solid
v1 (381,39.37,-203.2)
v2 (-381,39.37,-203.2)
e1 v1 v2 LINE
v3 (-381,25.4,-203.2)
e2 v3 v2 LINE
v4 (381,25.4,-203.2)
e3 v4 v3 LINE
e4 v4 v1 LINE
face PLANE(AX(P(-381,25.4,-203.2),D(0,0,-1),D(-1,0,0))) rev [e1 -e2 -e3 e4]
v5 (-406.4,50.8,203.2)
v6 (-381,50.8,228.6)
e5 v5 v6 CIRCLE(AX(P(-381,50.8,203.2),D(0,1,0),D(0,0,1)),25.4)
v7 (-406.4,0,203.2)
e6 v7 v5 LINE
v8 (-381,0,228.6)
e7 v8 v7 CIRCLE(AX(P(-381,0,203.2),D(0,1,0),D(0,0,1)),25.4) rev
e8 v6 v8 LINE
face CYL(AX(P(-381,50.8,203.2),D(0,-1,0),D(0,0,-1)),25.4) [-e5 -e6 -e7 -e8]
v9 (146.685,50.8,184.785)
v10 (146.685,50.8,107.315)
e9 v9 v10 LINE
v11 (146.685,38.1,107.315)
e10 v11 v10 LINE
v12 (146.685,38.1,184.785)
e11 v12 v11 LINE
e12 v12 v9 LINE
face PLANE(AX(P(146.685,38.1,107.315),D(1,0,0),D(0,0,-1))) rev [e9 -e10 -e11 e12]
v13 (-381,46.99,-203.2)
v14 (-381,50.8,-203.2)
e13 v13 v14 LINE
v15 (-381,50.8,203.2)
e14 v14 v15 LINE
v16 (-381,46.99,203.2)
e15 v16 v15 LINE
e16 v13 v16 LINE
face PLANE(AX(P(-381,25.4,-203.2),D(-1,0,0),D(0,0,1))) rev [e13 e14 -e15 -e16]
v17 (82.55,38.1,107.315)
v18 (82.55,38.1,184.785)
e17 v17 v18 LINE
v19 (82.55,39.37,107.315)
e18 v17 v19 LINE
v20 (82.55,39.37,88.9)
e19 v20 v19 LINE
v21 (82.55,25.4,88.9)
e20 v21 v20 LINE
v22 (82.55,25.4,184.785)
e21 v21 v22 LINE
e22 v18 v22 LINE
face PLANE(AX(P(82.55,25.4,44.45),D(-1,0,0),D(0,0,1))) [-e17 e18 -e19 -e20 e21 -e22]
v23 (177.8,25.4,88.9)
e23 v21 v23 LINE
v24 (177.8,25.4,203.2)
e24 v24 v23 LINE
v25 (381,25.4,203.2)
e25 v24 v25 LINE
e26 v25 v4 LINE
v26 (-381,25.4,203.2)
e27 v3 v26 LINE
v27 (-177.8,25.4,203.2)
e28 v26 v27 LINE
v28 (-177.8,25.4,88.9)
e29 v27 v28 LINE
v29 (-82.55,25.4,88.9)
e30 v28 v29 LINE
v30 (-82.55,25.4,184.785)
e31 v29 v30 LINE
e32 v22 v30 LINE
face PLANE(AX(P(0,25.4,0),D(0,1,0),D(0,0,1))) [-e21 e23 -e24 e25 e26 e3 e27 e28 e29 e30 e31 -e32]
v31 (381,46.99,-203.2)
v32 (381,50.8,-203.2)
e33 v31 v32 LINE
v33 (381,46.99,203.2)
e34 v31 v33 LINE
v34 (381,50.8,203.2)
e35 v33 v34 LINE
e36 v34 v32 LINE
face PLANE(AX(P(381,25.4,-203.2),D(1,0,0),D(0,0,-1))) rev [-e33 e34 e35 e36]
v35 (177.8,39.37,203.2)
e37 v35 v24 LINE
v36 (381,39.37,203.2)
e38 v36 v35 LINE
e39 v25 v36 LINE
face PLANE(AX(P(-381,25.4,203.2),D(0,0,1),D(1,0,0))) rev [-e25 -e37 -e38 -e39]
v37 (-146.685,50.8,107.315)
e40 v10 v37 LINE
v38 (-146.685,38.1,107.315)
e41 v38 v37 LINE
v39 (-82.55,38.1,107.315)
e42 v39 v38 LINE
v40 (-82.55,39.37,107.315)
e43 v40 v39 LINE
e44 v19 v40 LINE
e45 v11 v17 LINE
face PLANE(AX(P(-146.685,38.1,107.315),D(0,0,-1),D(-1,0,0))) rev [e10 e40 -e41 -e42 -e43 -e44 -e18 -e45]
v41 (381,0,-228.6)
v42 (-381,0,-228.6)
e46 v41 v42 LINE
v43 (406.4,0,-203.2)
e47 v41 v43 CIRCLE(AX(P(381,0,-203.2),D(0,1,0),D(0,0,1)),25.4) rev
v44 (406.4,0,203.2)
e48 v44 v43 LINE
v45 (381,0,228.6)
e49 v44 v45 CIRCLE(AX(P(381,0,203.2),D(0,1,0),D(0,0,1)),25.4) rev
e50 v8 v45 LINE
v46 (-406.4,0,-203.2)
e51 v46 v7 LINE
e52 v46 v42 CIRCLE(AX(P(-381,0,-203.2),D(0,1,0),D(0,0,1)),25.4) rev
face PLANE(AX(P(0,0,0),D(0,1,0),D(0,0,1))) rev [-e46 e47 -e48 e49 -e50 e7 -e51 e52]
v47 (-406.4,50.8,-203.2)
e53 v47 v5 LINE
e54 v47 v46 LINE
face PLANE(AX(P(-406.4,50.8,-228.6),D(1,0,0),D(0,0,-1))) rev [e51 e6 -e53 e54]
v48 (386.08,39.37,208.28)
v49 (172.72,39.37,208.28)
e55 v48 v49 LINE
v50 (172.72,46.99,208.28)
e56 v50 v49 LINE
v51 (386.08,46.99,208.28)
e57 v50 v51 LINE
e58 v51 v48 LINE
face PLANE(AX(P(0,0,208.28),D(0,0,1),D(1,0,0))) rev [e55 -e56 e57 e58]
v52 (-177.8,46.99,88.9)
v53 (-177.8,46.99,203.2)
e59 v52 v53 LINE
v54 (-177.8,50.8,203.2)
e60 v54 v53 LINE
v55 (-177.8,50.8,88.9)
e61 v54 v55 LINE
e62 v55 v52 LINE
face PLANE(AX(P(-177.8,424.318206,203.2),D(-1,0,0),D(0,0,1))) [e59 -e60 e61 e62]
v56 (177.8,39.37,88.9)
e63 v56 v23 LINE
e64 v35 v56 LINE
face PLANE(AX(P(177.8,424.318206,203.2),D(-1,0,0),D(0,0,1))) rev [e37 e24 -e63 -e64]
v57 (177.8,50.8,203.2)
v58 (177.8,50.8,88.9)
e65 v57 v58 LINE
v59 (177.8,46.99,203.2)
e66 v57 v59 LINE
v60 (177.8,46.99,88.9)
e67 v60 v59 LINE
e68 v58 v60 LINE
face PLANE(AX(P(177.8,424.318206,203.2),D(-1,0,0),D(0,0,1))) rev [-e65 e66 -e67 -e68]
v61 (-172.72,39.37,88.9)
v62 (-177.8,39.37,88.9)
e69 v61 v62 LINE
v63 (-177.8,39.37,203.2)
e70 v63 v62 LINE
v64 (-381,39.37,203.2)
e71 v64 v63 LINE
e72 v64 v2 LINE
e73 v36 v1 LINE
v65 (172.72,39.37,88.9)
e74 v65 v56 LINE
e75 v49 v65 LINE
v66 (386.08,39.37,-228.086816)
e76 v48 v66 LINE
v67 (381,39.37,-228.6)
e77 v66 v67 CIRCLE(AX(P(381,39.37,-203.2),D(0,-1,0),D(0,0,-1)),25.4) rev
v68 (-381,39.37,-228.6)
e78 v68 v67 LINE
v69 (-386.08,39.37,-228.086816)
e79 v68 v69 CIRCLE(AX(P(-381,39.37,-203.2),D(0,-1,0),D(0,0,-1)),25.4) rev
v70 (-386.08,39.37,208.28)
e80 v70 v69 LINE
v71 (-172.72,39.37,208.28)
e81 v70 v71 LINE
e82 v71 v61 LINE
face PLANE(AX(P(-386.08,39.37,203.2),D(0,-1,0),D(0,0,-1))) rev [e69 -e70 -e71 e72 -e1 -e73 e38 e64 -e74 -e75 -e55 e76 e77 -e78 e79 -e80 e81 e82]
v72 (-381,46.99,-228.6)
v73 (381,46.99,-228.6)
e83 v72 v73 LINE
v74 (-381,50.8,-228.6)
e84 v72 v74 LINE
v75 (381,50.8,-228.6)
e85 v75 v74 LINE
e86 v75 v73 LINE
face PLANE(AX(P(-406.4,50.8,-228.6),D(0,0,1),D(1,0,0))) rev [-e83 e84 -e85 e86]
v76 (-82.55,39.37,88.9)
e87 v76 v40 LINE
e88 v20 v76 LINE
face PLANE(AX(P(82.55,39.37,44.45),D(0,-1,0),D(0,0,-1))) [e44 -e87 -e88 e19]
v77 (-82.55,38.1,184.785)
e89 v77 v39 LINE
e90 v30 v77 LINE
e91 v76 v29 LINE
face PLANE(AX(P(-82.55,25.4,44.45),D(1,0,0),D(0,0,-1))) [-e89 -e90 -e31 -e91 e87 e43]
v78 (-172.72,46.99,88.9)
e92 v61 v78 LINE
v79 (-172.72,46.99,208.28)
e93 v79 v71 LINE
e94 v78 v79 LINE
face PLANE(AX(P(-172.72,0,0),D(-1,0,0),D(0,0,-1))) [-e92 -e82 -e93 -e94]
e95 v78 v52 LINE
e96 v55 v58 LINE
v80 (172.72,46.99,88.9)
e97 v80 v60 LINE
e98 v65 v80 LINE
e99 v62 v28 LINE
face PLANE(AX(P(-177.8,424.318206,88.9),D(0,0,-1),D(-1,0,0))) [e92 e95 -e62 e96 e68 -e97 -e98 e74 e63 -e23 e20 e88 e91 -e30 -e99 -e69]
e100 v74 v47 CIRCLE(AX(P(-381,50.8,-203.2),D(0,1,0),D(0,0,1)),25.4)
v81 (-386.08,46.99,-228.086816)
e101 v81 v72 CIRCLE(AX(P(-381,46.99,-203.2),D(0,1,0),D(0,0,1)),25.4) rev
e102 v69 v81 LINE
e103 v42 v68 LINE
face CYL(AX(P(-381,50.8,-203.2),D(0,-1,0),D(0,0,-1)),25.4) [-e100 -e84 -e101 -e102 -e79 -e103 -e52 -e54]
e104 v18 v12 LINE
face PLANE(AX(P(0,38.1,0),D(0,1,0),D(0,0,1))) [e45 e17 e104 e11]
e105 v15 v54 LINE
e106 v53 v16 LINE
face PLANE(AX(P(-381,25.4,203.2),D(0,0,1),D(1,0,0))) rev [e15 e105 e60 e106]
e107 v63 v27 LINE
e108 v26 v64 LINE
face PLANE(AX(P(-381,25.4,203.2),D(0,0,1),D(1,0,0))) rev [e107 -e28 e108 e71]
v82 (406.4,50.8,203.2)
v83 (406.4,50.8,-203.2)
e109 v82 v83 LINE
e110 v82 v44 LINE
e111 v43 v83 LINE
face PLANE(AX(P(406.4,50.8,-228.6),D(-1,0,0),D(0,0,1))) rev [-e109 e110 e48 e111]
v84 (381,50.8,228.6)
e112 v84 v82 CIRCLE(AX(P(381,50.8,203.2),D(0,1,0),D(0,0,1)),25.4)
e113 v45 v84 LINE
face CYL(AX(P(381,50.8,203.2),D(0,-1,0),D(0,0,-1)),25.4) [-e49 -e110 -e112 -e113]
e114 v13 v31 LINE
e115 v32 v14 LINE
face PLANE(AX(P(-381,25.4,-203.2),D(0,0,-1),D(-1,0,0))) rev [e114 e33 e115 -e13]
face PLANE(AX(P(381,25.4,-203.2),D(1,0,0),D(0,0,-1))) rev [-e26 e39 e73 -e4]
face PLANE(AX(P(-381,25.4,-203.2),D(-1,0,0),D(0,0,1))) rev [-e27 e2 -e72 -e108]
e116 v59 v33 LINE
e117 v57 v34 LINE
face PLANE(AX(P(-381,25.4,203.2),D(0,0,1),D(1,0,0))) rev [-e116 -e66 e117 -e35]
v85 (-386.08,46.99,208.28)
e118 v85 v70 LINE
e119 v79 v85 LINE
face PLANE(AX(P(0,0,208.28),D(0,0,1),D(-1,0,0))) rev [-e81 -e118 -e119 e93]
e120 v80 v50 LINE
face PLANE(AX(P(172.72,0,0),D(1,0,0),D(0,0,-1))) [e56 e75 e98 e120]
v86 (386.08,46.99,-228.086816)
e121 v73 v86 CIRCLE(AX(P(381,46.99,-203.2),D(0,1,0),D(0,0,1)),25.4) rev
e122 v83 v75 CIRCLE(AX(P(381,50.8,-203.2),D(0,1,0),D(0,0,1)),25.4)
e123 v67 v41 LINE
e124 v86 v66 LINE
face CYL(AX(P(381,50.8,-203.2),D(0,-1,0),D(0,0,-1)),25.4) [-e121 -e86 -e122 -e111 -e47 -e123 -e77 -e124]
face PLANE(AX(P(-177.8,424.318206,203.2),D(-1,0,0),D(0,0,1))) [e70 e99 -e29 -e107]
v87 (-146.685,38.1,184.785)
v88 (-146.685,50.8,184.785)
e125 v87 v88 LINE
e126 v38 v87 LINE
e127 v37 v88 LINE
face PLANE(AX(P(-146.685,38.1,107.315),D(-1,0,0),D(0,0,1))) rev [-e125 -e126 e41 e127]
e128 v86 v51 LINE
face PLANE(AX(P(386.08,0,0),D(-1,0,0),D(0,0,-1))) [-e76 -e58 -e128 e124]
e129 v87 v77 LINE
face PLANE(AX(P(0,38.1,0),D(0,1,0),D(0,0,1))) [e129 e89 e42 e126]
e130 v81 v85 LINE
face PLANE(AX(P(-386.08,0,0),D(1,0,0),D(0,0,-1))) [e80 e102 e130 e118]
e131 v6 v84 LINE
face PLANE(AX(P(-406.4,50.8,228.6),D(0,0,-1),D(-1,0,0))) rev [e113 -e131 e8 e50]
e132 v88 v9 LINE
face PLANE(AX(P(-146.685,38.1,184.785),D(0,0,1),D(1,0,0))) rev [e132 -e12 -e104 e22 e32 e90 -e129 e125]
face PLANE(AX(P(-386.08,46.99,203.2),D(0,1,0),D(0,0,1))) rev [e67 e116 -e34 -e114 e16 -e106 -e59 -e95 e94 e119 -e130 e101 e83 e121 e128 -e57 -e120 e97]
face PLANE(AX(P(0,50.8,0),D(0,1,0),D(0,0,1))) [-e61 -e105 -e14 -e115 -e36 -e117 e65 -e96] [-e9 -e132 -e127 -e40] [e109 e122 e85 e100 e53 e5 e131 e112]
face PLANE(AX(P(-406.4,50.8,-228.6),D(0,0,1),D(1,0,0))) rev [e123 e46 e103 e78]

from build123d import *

# Parameters (mm, degrees)
SKETCH3_W                       = 812.8
SKETCH3_H                       = 457.2
BOSS_EXTRUDE3_DEPTH             = 50.8
SKETCH7_W                       = 762
SKETCH7_H                       = 406.4
CUT_EXTRUDE1_DEPTH              = 25.4
SKETCH8_W                       = 355.6
SKETCH8_H                       = 114.3
BOSS_EXTRUDE7_DEPTH             = 25.4
SKETCH23_W                      = 431.8
SKETCH23_H                      = 7.62
CUT_EXTRUDE11_DEPTH             = 5.08
SKETCH24_W                      = 762
SKETCH24_H                      = 7.62
CUT_EXTRUDE12_DEPTH             = 81.026
SKETCH26_W                      = 208.28
SKETCH26_H                      = 7.62
CUT_EXTRUDE13_DEPTH             = 5.08
SKETCH28_W                      = 119.38
SKETCH28_H                      = 7.62
CUT_EXTRUDE14_DEPTH             = 5.08
SKETCH30_W                      = 293.37
SKETCH30_H                      = 77.47
CUT_EXTRUDE16_DEPTH             = 12.7
CUT_EXTRUDE19_REACH             = 520.216
SKETCH32_W                      = 165.1
SKETCH32_H                      = 13.97
CUT_EXTRUDE19_DIRECTION_2_DEPTH = 44.45
FILLET1_R                       = 25.4


with BuildPart() as part:
    # Sketch3 → Boss-Extrude3 (new body)
    with BuildSketch(Plane(origin=(0, 0, 0), x_dir=(1, 0, 0), z_dir=(0, 1, 0))):
        Rectangle(SKETCH3_W, SKETCH3_H)
    extrude(amount=BOSS_EXTRUDE3_DEPTH)

    # Sketch7 → Cut-Extrude1 (cut)
    with BuildSketch(Plane(origin=(0, 50.8, 0), x_dir=(1, 0, 0), z_dir=(0, 1, 0))):
        Rectangle(SKETCH7_W, SKETCH7_H)
    extrude(amount=-CUT_EXTRUDE1_DEPTH, mode=Mode.SUBTRACT)

    # Sketch8 → Boss-Extrude7 (add)
    with BuildSketch(Plane(origin=(0, 25.4, 0), x_dir=(1, 0, 0), z_dir=(0, 1, 0))):
        with Locations((0, -146.05)):
            Rectangle(SKETCH8_W, SKETCH8_H)
    extrude(amount=BOSS_EXTRUDE7_DEPTH)

    # Sketch23 → Cut-Extrude11 (cut)
    with BuildSketch(Plane(origin=(-381, 0, 0), x_dir=(0, 0, -1), z_dir=(1, 0, 0))):
        with Locations((12.7, 43.18)):
            Rectangle(SKETCH23_W, SKETCH23_H)
    cut_extrude11 = extrude(amount=-CUT_EXTRUDE11_DEPTH, mode=Mode.SUBTRACT)

    # Mirror3: Cut-Extrude11 across plane
    add(cut_extrude11.mirror(Plane(origin=(0, 0, 0), x_dir=(0, 0, 1), z_dir=(1, 0, 0))), mode=Mode.SUBTRACT)

    # Sketch24 → Cut-Extrude12 (cut)
    with BuildSketch(Plane(origin=(0, 0, -228.6), x_dir=(-1, 0, 0), z_dir=(0, 0, -1))):
        with Locations((0, 43.18)):
            Rectangle(SKETCH24_W, SKETCH24_H)
    extrude(amount=-CUT_EXTRUDE12_DEPTH, mode=Mode.SUBTRACT)

    # Sketch26 → Cut-Extrude13 (cut)
    with BuildSketch(Plane(origin=(0, 0, 203.2), x_dir=(-1, 0, 0), z_dir=(0, 0, -1))):
        with Locations((-281.94, 43.18)):
            Rectangle(SKETCH26_W, SKETCH26_H)
    cut_extrude13 = extrude(amount=-CUT_EXTRUDE13_DEPTH, mode=Mode.SUBTRACT)

    # Mirror4: Cut-Extrude13 across plane
    add(cut_extrude13.mirror(Plane(origin=(0, 0, 0), x_dir=(0, 0, 1), z_dir=(1, 0, 0))), mode=Mode.SUBTRACT)

    # Sketch28 → Cut-Extrude14 (cut)
    with BuildSketch(Plane(origin=(177.8, 0, 0), x_dir=(0, 0, -1), z_dir=(1, 0, 0))):
        with Locations((-148.59, 43.18)):
            Rectangle(SKETCH28_W, SKETCH28_H)
    cut_extrude14 = extrude(amount=-CUT_EXTRUDE14_DEPTH, mode=Mode.SUBTRACT)

    # Mirror5: Cut-Extrude14 across plane
    add(cut_extrude14.mirror(Plane(origin=(0, 0, 0), x_dir=(0, 0, 1), z_dir=(1, 0, 0))), mode=Mode.SUBTRACT)

    # Sketch30 → Cut-Extrude16 (cut)
    with BuildSketch(Plane(origin=(0, 50.8, 0), x_dir=(1, 0, 0), z_dir=(0, 1, 0))):
        with Locations((0, -146.05)):
            Rectangle(SKETCH30_W, SKETCH30_H)
    extrude(amount=-CUT_EXTRUDE16_DEPTH, mode=Mode.SUBTRACT)

    # Cut-Extrude19: up to this face of the body (flat: up to its plane)
    cut_extrude19_end = Plane(part.part.faces().sort_by_distance((0, 44.45, 184.785))[0])
    # Sketch32 → Cut-Extrude19 (cut, up to the picked face)
    with BuildSketch(Plane(origin=(0, 0, 88.9), x_dir=(-1, 0, 0), z_dir=(0, 0, -1)), mode=Mode.PRIVATE) as cut_extrude19_sk1:
        with Locations((0, 32.385)):
            Rectangle(SKETCH32_W, SKETCH32_H)
    cut_extrude19_tool1 = split(extrude(cut_extrude19_sk1.sketch, amount=-CUT_EXTRUDE19_REACH, mode=Mode.PRIVATE), bisect_by=cut_extrude19_end, keep=Keep.BOTH, mode=Mode.PRIVATE)
    add(cut_extrude19_tool1.solids().sort_by(Axis((0, 32.385, 88.9), (0, 0, 1)))[0], mode=Mode.SUBTRACT)

    # Sketch32 → Cut-Extrude19 direction 2 (cut)
    with BuildSketch(Plane(origin=(0, 0, 88.9), x_dir=(-1, 0, 0), z_dir=(0, 0, -1))):
        with Locations((0, 32.385)):
            Rectangle(SKETCH32_W, SKETCH32_H)
    extrude(amount=CUT_EXTRUDE19_DIRECTION_2_DEPTH, mode=Mode.SUBTRACT)

    # Fillet1
    # the kernel refuses this fillet: 25.4 mm, written as the material it takes off along each edge
    with BuildSketch(Plane(origin=(-406.4, -63.5, -228.6), x_dir=(1, 0, 0), z_dir=(0, 1, 0)), Plane(origin=(-406.4, -63.5, 228.6), x_dir=(0, 0, -1), z_dir=(0, 1, 0))) as fillet1_piece_1:
        with BuildLine():
            CenterArc((FILLET1_R, -FILLET1_R), FILLET1_R, 90, 90)
            Line((0, -FILLET1_R), (0, 0))
            Line((0, 0), (FILLET1_R, 0))
        make_face()
    extrude(amount=177.8, mode=Mode.SUBTRACT)
    with BuildSketch(Plane(origin=(406.4, -63.5, -228.6), x_dir=(-1, 0, 0), z_dir=(0, 1, 0)), Plane(origin=(406.4, -63.5, 228.6), x_dir=(0, 0, -1), z_dir=(0, 1, 0))) as fillet1_piece_2:
        with BuildLine():
            CenterArc((FILLET1_R, FILLET1_R), FILLET1_R, 180, 90)
            Line((0, FILLET1_R), (0, 0))
            Line((0, 0), (FILLET1_R, 0))
        make_face()
    extrude(amount=177.8, mode=Mode.SUBTRACT)


solid = part.part
